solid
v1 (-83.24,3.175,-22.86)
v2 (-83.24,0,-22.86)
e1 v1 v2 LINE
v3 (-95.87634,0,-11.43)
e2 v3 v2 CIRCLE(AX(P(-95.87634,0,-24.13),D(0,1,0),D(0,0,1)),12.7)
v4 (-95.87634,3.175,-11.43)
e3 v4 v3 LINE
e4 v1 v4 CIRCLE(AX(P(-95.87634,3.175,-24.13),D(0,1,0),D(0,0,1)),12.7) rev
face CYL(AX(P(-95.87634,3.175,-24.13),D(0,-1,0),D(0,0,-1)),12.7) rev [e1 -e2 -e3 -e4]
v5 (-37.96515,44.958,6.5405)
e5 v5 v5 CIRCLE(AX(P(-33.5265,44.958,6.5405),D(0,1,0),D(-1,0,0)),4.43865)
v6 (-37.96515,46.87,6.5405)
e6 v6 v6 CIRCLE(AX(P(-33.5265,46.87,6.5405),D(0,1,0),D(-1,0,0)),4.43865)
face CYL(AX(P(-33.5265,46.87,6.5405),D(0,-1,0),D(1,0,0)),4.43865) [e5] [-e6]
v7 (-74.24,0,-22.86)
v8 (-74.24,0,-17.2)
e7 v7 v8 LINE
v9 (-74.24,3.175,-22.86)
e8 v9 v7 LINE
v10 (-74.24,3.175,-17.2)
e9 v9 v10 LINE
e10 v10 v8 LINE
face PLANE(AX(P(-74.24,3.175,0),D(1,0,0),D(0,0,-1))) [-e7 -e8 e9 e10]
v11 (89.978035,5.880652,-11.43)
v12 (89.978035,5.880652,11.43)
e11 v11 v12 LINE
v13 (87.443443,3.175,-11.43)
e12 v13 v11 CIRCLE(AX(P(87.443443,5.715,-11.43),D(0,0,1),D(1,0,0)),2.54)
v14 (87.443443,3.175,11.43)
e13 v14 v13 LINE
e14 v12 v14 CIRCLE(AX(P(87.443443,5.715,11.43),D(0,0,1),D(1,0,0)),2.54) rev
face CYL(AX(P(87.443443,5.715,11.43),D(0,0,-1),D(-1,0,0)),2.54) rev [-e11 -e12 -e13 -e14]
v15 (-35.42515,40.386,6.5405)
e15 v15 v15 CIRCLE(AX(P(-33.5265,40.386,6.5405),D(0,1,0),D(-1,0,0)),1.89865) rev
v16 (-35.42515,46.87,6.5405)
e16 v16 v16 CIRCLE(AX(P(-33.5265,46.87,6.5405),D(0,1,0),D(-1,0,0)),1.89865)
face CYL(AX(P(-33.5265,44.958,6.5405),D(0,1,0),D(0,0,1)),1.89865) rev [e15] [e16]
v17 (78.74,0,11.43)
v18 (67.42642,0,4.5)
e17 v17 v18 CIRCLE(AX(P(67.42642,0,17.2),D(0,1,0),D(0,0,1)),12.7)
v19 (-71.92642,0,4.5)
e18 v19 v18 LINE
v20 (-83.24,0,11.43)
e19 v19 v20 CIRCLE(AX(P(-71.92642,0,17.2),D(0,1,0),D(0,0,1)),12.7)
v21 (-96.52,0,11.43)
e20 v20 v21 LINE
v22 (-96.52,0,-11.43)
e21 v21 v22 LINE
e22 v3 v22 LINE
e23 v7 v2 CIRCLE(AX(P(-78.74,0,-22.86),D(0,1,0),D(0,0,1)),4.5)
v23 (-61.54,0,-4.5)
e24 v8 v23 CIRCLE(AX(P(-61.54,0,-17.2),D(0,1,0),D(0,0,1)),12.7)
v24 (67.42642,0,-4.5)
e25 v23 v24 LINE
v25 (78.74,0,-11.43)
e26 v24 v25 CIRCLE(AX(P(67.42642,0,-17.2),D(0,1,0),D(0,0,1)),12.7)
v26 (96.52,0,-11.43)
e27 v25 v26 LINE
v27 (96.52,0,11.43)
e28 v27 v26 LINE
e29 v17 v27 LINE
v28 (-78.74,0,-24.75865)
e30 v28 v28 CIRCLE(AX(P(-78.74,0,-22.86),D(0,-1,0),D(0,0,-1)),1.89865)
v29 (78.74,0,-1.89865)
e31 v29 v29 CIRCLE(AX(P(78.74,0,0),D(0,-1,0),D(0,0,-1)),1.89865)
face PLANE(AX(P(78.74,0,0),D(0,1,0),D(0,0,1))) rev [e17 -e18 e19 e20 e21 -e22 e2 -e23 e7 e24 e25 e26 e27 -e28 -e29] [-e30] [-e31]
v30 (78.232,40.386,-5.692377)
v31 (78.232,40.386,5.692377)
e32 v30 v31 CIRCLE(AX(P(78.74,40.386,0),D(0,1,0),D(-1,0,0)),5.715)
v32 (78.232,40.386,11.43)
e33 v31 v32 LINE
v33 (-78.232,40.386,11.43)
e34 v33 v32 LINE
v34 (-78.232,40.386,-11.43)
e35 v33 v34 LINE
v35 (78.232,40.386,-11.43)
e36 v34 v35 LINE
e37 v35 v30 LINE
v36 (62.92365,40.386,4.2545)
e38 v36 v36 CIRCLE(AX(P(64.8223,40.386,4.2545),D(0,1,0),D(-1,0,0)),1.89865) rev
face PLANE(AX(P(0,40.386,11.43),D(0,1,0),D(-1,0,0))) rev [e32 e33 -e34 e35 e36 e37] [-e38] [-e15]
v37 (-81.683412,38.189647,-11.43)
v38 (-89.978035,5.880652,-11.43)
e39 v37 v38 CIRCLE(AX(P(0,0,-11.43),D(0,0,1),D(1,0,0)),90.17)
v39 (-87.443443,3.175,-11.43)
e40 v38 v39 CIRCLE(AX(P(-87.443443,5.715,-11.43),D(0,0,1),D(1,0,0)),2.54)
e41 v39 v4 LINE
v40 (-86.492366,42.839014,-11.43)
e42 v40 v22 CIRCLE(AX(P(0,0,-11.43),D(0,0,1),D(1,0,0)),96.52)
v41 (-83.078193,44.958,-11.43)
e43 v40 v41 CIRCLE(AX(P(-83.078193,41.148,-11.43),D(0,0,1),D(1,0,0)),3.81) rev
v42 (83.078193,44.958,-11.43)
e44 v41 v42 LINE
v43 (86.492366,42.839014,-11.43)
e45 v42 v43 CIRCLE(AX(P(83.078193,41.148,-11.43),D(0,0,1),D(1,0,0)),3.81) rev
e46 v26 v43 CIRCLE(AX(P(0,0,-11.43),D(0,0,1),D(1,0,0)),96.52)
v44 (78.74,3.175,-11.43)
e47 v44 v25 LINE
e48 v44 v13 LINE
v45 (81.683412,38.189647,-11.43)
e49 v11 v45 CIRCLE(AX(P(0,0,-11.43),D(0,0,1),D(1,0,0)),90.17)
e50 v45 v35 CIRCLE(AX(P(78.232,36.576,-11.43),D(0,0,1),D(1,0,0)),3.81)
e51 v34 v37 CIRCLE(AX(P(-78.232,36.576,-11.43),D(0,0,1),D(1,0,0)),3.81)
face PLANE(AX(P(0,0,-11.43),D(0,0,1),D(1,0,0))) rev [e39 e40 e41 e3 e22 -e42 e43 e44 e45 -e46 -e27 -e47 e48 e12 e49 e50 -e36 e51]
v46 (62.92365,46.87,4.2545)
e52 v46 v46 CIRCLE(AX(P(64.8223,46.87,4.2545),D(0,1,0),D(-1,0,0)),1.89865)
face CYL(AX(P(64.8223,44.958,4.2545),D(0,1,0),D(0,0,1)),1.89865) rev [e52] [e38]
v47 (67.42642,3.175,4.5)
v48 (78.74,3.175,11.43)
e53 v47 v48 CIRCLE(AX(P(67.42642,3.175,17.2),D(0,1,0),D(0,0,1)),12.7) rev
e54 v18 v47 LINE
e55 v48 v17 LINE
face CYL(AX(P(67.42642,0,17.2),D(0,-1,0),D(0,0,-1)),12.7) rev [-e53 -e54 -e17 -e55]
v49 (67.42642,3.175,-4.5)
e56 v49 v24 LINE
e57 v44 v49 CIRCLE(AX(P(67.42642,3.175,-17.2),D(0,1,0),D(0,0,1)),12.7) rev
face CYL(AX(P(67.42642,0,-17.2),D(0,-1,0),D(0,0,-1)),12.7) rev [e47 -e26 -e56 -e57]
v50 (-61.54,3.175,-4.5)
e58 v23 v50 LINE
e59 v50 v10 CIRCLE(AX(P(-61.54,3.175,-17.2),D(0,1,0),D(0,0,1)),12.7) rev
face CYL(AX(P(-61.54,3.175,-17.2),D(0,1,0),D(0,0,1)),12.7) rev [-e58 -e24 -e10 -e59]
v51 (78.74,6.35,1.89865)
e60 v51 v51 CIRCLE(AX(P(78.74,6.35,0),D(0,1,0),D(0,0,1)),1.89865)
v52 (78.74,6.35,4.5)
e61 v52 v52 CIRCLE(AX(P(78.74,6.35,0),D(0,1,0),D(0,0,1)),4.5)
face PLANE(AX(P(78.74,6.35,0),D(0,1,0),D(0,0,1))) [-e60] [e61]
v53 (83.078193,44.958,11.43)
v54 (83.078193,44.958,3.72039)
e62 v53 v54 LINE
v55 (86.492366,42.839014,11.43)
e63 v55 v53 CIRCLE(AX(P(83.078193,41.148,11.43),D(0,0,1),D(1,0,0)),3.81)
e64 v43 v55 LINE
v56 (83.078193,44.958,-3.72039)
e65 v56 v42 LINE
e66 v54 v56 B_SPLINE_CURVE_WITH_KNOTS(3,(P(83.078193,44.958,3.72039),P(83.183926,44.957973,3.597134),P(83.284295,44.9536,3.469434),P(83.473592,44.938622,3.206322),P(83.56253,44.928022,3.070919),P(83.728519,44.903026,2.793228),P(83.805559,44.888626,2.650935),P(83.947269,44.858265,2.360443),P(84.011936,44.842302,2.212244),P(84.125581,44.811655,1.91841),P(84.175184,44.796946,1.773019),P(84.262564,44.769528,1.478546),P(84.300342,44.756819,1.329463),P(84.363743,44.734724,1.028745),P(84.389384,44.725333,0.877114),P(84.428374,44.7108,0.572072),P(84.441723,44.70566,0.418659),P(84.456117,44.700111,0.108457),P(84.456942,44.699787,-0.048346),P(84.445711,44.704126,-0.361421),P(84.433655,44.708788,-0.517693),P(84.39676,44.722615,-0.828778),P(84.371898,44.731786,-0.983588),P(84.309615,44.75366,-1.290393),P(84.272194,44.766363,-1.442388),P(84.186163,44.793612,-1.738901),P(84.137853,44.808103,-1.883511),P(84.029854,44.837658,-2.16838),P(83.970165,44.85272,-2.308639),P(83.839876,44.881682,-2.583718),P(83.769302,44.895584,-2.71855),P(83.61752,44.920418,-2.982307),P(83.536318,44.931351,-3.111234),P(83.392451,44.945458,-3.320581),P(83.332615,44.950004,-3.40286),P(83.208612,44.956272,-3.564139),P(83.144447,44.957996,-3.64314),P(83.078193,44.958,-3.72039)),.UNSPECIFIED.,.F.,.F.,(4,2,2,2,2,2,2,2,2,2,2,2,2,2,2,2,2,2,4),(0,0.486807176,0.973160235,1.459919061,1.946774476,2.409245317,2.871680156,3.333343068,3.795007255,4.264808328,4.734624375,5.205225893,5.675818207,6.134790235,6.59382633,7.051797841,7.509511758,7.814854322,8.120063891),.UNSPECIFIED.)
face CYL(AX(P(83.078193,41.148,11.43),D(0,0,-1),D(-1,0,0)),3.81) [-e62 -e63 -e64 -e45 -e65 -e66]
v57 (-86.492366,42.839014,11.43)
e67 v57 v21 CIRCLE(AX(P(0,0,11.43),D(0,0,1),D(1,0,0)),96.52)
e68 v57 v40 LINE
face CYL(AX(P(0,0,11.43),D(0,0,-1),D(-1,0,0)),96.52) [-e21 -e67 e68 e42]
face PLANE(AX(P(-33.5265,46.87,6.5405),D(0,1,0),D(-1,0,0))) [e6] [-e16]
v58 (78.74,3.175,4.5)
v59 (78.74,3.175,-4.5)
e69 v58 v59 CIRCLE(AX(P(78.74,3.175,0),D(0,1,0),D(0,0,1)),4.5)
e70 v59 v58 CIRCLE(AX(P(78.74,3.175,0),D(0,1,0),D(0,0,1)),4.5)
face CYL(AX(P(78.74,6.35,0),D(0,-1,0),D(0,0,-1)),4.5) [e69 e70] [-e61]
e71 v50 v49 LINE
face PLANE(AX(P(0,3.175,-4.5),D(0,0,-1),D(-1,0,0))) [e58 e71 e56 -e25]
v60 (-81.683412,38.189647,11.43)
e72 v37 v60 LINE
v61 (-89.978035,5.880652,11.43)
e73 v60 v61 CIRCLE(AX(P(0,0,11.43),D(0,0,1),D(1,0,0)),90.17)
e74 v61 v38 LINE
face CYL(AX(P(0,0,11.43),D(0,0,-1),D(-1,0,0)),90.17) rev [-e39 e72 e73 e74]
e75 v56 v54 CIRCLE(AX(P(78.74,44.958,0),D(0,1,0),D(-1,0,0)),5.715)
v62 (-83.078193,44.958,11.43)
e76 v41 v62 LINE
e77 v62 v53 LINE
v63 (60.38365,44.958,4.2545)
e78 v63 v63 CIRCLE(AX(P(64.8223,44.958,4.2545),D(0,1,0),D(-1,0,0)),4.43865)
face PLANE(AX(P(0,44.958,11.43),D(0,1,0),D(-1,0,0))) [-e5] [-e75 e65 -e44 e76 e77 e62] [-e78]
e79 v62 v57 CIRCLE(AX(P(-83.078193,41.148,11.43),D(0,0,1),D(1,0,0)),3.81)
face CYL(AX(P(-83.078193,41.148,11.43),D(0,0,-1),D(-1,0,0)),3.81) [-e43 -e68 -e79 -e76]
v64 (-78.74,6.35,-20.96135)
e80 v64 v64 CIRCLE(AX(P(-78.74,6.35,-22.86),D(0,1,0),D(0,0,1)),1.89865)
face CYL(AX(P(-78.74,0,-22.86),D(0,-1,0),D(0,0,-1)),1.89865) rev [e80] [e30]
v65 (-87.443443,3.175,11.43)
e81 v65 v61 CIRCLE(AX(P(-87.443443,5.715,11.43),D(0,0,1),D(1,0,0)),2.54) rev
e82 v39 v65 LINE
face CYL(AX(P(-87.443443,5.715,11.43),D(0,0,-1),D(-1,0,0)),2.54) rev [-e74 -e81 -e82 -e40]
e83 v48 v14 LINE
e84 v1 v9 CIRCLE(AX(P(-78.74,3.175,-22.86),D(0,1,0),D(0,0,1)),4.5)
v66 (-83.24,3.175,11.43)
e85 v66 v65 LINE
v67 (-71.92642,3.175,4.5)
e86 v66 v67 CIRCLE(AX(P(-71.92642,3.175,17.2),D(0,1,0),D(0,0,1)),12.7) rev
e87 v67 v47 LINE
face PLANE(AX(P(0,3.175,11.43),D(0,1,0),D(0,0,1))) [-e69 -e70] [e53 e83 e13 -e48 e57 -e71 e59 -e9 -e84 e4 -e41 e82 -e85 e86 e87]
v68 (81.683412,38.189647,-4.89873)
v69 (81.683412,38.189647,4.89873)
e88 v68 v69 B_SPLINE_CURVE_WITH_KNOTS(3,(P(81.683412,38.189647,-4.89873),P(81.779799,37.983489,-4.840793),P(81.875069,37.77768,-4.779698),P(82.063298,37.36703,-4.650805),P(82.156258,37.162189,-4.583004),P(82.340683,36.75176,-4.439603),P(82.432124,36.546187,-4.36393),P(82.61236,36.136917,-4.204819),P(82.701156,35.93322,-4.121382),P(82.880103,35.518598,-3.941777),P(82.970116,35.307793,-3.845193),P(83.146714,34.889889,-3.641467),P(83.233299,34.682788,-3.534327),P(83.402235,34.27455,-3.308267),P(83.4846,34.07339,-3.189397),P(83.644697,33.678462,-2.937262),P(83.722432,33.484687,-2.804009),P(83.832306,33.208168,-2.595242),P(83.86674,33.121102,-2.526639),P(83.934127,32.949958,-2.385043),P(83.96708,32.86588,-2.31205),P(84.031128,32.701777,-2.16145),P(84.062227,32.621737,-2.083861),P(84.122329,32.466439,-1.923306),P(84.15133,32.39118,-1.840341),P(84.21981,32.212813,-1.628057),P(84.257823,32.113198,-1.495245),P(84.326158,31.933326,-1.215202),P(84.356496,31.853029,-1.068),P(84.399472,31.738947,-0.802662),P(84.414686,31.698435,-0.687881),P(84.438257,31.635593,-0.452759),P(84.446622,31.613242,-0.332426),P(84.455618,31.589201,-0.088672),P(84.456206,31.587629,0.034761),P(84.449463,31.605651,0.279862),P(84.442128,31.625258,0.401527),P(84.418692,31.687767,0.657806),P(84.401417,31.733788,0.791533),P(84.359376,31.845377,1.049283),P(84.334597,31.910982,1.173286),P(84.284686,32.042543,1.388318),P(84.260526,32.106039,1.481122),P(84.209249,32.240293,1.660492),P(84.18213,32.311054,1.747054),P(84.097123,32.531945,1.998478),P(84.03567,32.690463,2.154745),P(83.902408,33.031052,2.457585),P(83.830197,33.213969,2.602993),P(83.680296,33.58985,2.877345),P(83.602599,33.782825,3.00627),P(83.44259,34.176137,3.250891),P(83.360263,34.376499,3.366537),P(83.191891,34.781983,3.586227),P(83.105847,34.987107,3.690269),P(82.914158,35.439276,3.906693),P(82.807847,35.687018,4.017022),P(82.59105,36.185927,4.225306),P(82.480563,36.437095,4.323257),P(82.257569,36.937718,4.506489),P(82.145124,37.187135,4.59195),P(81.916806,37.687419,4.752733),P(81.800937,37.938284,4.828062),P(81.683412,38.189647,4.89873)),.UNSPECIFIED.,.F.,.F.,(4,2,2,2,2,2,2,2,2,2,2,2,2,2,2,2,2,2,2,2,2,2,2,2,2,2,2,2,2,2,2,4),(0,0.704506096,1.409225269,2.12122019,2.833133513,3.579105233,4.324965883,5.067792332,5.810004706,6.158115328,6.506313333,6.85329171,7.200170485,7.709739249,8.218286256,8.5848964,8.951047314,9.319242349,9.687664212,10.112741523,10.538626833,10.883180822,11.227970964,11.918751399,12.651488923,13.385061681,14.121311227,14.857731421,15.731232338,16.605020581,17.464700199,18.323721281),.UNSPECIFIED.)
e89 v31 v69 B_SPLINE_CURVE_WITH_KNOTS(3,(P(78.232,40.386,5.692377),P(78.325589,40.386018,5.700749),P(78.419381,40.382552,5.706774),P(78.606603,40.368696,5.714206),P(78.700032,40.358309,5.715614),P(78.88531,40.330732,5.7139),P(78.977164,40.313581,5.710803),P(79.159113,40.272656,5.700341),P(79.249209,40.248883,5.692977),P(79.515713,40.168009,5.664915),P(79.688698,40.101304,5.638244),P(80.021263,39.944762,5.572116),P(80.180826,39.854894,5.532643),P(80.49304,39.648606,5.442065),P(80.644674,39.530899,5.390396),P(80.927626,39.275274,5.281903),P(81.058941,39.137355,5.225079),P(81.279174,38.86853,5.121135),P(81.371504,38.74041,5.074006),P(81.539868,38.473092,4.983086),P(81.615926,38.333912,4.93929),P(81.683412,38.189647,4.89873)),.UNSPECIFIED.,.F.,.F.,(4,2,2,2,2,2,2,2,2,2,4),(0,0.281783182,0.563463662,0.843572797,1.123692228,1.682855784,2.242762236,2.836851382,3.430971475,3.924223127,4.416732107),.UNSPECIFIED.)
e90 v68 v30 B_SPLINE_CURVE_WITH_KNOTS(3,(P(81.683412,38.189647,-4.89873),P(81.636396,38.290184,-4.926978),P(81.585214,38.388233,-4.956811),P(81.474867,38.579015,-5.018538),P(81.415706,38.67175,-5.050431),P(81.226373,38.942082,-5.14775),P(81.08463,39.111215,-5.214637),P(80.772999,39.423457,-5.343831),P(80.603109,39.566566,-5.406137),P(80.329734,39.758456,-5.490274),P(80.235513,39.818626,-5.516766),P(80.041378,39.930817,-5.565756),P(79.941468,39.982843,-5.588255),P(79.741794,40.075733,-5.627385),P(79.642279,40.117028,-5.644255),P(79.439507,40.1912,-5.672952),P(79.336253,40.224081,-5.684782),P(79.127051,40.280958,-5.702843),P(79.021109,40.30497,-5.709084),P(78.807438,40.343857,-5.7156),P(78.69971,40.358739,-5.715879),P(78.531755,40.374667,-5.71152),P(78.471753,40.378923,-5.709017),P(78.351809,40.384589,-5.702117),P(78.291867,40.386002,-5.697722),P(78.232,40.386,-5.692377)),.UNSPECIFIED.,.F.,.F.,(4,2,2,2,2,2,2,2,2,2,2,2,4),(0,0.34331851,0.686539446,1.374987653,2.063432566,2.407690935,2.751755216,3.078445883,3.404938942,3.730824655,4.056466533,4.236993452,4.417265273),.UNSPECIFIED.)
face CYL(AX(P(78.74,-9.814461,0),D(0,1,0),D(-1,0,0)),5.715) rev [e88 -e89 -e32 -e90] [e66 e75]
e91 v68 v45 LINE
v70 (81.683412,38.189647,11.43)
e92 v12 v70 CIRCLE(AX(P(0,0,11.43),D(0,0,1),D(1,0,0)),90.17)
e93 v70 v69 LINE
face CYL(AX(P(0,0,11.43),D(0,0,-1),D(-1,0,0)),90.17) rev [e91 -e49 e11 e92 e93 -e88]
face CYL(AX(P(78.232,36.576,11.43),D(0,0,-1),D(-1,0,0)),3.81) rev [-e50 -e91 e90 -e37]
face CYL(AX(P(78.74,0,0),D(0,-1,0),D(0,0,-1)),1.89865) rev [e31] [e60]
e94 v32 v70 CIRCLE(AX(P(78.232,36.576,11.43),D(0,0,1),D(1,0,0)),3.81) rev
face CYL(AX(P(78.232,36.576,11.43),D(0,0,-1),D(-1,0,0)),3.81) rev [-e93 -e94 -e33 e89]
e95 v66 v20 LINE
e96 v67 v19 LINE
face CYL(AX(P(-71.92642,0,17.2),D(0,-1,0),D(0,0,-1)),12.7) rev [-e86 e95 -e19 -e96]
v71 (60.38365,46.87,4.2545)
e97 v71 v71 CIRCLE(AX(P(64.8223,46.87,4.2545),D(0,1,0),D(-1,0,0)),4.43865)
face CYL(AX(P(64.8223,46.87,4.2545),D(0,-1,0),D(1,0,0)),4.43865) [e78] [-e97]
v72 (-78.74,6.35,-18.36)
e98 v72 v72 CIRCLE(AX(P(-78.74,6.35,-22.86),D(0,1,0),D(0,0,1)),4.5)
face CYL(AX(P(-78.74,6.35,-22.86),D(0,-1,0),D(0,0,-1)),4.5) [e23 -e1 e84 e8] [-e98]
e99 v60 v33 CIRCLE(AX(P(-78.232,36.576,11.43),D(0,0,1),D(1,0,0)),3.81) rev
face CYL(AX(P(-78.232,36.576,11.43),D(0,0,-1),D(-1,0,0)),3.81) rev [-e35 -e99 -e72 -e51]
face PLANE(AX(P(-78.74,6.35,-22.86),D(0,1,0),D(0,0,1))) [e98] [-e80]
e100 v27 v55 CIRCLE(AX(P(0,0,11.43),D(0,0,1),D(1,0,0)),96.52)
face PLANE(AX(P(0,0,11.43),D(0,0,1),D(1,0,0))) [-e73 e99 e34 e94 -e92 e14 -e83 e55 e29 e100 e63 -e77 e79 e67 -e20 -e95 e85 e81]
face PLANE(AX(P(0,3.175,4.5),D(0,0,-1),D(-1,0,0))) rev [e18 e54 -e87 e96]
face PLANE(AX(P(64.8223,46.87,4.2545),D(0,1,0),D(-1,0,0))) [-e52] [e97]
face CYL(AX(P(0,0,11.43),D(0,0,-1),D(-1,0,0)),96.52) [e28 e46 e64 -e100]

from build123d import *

# Parameters (mm, degrees)
SKETCH1_R                  = 4.5
BOSS_EXTRUDE1_DEPTH        = 6.35
BOSS_EXTRUDE1_2_DEPTH      = 6.35
BOSS_EXTRUDE2_DEPTH        = 3.175
SKETCH5_W                  = 4.5
SKETCH5_H                  = 3.175
BOSS_EXTRUDE3_DEPTH        = 11.43
F_6_CLEARANCE_HOLE1_D      = 3.7973
FILLET1_R                  = 2.54
FILLET2_R                  = 3.81
FILLET3_R                  = 12.7
CUT_EXTRUDE1_REACH         = 111.936
SKETCH10_R                 = 5.715
F_6_CLEARANCE_HOLE2_REACH  = 143.713
F_6_CLEARANCE_HOLE2_BORE_R = 1.89865
BOSS_EXTRUDE5_START        = 1.912
SKETCH13_R                 = 4.43865
SKETCH13_R_2               = 1.89865
BOSS_EXTRUDE5_DEPTH        = 1.912


with BuildPart() as part:
    # Sketch1 → Boss-Extrude1 (new body)
    with BuildSketch(Plane(origin=(0, 0, 0), x_dir=(1, 0, 0), z_dir=(0, 1, 0))):
        with Locations(Location((78.74, 0, 0), (0, 0, 270))):
            Circle(SKETCH1_R)
    extrude(amount=BOSS_EXTRUDE1_DEPTH)



with BuildPart() as body_2:
    # Sketch1 → Boss-Extrude1 2 (new body)
    with BuildSketch(Plane(origin=(0, 0, 0), x_dir=(1, 0, 0), z_dir=(0, 1, 0))):
        with Locations(Location((-78.74, 22.86, 0), (0, 0, 270))):
            Circle(SKETCH1_R)
    extrude(amount=BOSS_EXTRUDE1_2_DEPTH)


with BuildPart() as part_1:
    add(part.part)

    add(body_2.part)  # Boss-Extrude2 merges body 2
    # Sketch2 → Boss-Extrude2 (add)
    with BuildSketch(Plane(origin=(0, 0, 0), x_dir=(1, 0, 0), z_dir=(0, 1, 0))):
        with BuildLine():
            ThreePointArc((-74.24, 22.86), (-78.74, 18.36), (-83.24, 22.86))
            Line((-83.24, 22.86), (-83.24, -4.5))
            Line((-83.24, -4.5), (78.74, -4.5))
            ThreePointArc((78.74, -4.5), (74.24, 0), (78.74, 4.5))
            Line((78.74, 4.5), (-74.24, 4.5))
            Line((-74.24, 4.5), (-74.24, 22.86))
        make_face()
    extrude(amount=BOSS_EXTRUDE2_DEPTH)

    # Sketch5 → Boss-Extrude3 (add, symmetric)
    with BuildSketch(Plane.XY):
        with BuildLine():
            ThreePointArc((-90.114084776, 3.175), (-87.371075104, 22.291795245), (-80.620096155, 40.386))
            Line((-80.620096155, 40.386), (-87.664596069, 40.386))
            ThreePointArc((-87.664596069, 40.386), (-94.280160195, 20.672730678), (-96.52, 0))
            Line((-96.52, 0), (-83.24, 0))
            Line((-83.24, 0), (-83.24, 3.175))
            Line((-83.24, 3.175), (-90.114084776, 3.175))
        make_face()
        with BuildLine():
            Line((80.620096155, 40.386), (87.664596069, 40.386))
            ThreePointArc((87.664596069, 40.386), (86.567546752, 42.686886152), (85.41012022, 44.958))
            Line((85.41012022, 44.958), (78.162696576, 44.958))
            ThreePointArc((78.162696576, 44.958), (79.424301148, 42.689685958), (80.620096155, 40.386))
        make_face()
        with BuildLine():
            Line((-87.664596069, 40.386), (-80.620096155, 40.386))
            ThreePointArc((-80.620096155, 40.386), (-79.424301148, 42.689685958), (-78.162696576, 44.958))
            Line((-78.162696576, 44.958), (-85.41012022, 44.958))
            ThreePointArc((-85.41012022, 44.958), (-86.567546752, 42.686886152), (-87.664596069, 40.386))
        make_face()
        with BuildLine():
            Line((-80.620096155, 40.386), (80.620096155, 40.386))
            ThreePointArc((80.620096155, 40.386), (79.424301148, 42.689685958), (78.162696576, 44.958))
            Line((78.162696576, 44.958), (-78.162696576, 44.958))
            ThreePointArc((-78.162696576, 44.958), (-79.424301148, 42.689685958), (-80.620096155, 40.386))
        make_face()
        with Locations((80.99, 1.5875)):
            Rectangle(SKETCH5_W, SKETCH5_H)
        with BuildLine():
            Line((83.24, 3.175), (83.24, 0))
            Line((83.24, 0), (96.52, 0))
            ThreePointArc((96.52, 0), (94.280160195, 20.672730678), (87.664596069, 40.386))
            Line((87.664596069, 40.386), (80.620096155, 40.386))
            ThreePointArc((80.620096155, 40.386), (87.371075104, 22.291795245), (90.114084776, 3.175))
            Line((90.114084776, 3.175), (83.24, 3.175))
        make_face()
    extrude(amount=BOSS_EXTRUDE3_DEPTH, both=True)

    # #6 Clearance Hole1 (through all)
    with Locations(Plane(origin=(-78.74, 0, -22.86), x_dir=(0, 0, -1), z_dir=(0, -1, 0))):
        with Locations((0, 0), (-22.86, 157.48)):
            Hole(F_6_CLEARANCE_HOLE1_D / 2)

    # Fillet1
    fillet1_edges = [part_1.edges().sort_by_distance(p)[0] for p in [
        (-90.114084776, 3.175, 0),
        (90.114084776, 3.175, 0),
    ]]
    fillet(fillet1_edges, radius=FILLET1_R)

    # Fillet2
    # the kernel refuses this fillet: 3.81 mm, written as the material it adds along each edge
    with BuildSketch(Plane(origin=(80.620096155, 40.386, 5.835732073), x_dir=(-1, 0, 0), z_dir=(0, 0, -1))) as fillet2_piece_1_section:
        with BuildLine():
            CenterArc((2.388096155, -3.81), FILLET2_R, 90, 64.942384582)
            ThreePointArc((-1.06331561, -2.196352941), (-0.539087936, -1.094579337), (0, 0))
            Line((0, 0), (2.388096155, 0))
        make_face()
    fillet2_piece_1 = extrude(amount=17.265732073, mode=Mode.PRIVATE)
    fillet2_piece_1 = fillet2_piece_1 - Plane(origin=(78.74, 40.386, 0), x_dir=(0, 0, 1), z_dir=(0, 1, 0)) * Cylinder(1.89865, 45, mode=Mode.PRIVATE)
    add(fillet2_piece_1)
    with BuildSketch(Plane(origin=(80.620096155, 40.386, 11.43), x_dir=(-1, 0, 0), z_dir=(0, 0, -1))) as fillet2_piece_2_section:
        with BuildLine():
            CenterArc((2.388096155, -3.81), FILLET2_R, 90, 64.942384582)
            ThreePointArc((-1.06331561, -2.196352941), (-0.539087936, -1.094579337), (0, 0))
            Line((0, 0), (2.388096155, 0))
        make_face()
    fillet2_piece_2 = extrude(amount=17.265732073, mode=Mode.PRIVATE)
    fillet2_piece_2 = fillet2_piece_2 - Plane(origin=(78.74, 40.386, 0), x_dir=(0, 0, 1), z_dir=(0, 1, 0)) * Cylinder(1.89865, 45, mode=Mode.PRIVATE)
    add(fillet2_piece_2)
    with BuildSketch(Plane(origin=(-80.620096155, 40.386, -11.43), x_dir=(-0.4357482606496553, -0.900068582576239, 0), z_dir=(0, 0, 1))) as fillet2_piece_3:
        with BuildLine():
            CenterArc((2.388652554, 3.809651194), FILLET2_R, 205.832916425, 64.942384582)
            Line((-1.040608746, 2.149450321), (0, 0))
            ThreePointArc((0, 0), (1.220103103, -0.008255072), (2.440206206, 0))
        make_face()
    extrude(amount=22.86)
    # the kernel refuses this fillet: 3.81 mm, written as the material it takes off along each edge
    with BuildSketch(Plane(origin=(-85.41012022, 44.958, -17.378402089), x_dir=(-0.4548470974381097, -0.8905695469485393, 0), z_dir=(0, 0, 1))) as fillet2_2_piece_1:
        with BuildLine():
            CenterArc((2.332399766, 3.809710574), FILLET2_R, 207.055096642, 63.651134119)
            Line((-1.060670207, 2.076743133), (0, 0))
            ThreePointArc((0, 0), (1.189680418, -0.007332124), (2.379360836, 0))
        make_face()
    extrude(amount=34.756804178, mode=Mode.SUBTRACT)
    with BuildSketch(Plane(origin=(85.41012022, 44.958, 17.378402089), x_dir=(-1, 0, 0), z_dir=(0, 0, -1))) as fillet2_2_piece_2:
        with BuildLine():
            CenterArc((2.331926956, -3.81), FILLET2_R, 90, 63.651134119)
            ThreePointArc((-1.08224537, -2.118986301), (-0.547652451, -1.056158155), (0, 0))
            Line((0, 0), (2.331926956, 0))
        make_face()
    extrude(amount=34.756804178, mode=Mode.SUBTRACT)

    # Fillet3
    # the kernel refuses this fillet: 12.7 mm, written as the material it adds along each edge
    with BuildSketch(Plane(origin=(78.74, 0, -4.5), x_dir=(0, 0, -1), z_dir=(0, 1, 0)), Plane(origin=(-83.24, 0, 4.5), x_dir=(0, 0, 1), z_dir=(0, 1, 0))) as fillet3_piece_1:
        with BuildLine():
            CenterArc((12.7, 11.313580335), FILLET3_R, 180, 62.978120887)
            Line((0, 11.313580335), (0, 0))
            Line((0, 0), (6.93, 0))
        make_face()
    extrude(amount=3.175)
    with BuildSketch(Plane(origin=(78.74, 0, 4.5), x_dir=(0, 0, 1), z_dir=(0, 1, 0))) as fillet3_piece_2:
        with BuildLine():
            CenterArc((12.7, -11.313580335), FILLET3_R, 117.021879113, 62.978120887)
            Line((0, -11.313580335), (0, 0))
            Line((0, 0), (6.93, 0))
        make_face()
    extrude(amount=3.175)
    with BuildSketch(Plane(origin=(-74.24, 0, -4.5), x_dir=(1, 0, 0), z_dir=(0, 1, 0))) as fillet3_piece_3:
        with BuildLine():
            CenterArc((FILLET3_R, FILLET3_R), FILLET3_R, 180, 90)
            Line((0, FILLET3_R), (0, 0))
            Line((0, 0), (FILLET3_R, 0))
        make_face()
    extrude(amount=3.175)
    with BuildSketch(Plane(origin=(-83.24, 0, -11.43), x_dir=(-1, 0, 0), z_dir=(0, 1, 0))) as fillet3_piece_4:
        with BuildLine():
            CenterArc((12.636340451, -12.7), FILLET3_R, 90, 84.260829523)
            Line((0, -11.43), (0, 0))
            Line((0, 0), (12.636340451, 0))
        make_face()
    extrude(amount=3.175)

    # Cut-Extrude1: up to this face of the body (flat: up to its plane)
    cut_extrude1_end = Plane(part_1.part.faces().sort_by_distance((78.74, 6.35, -4.372720779))[0])
    # Sketch10 → Cut-Extrude1 (cut, up to the picked face)
    with BuildSketch(Plane(origin=(0, 44.958, 0), x_dir=(1, 0, 0), z_dir=(0, 1, 0)), mode=Mode.PRIVATE) as cut_extrude1_sk1:
        with Locations(Location((78.74, 0, 0), (0, 0, 95.099688914))):
            Circle(SKETCH10_R)
    cut_extrude1_tool1 = split(extrude(cut_extrude1_sk1.sketch, amount=-CUT_EXTRUDE1_REACH, mode=Mode.PRIVATE), bisect_by=cut_extrude1_end, keep=Keep.BOTH, mode=Mode.PRIVATE)
    add(cut_extrude1_tool1.solids().sort_by(Axis((78.74, 44.958, 0), (0, -1, 0)))[0], mode=Mode.SUBTRACT)

    # #6 Clearance Hole2 bore (on position points) → #6 Clearance Hole2 (cut, up to next)
    with BuildSketch(Plane(origin=(-33.5265, 44.958, 6.5405), x_dir=(1, 0, 0), z_dir=(0, 1, 0)), mode=Mode.PRIVATE) as f_6_clearance_hole2_sk1:
        Circle(F_6_CLEARANCE_HOLE2_BORE_R)
    f_6_clearance_hole2_tool1 = extrude(f_6_clearance_hole2_sk1.sketch, amount=-F_6_CLEARANCE_HOLE2_REACH, mode=Mode.PRIVATE) & part_1.part
    # #6 Clearance Hole2 bore (on position points) → #6 Clearance Hole2 (cut, up to next)
    with BuildSketch(Plane(origin=(-33.5265, 44.958, 6.5405), x_dir=(1, 0, 0), z_dir=(0, 1, 0)), mode=Mode.PRIVATE) as f_6_clearance_hole2_sk2:
        with Locations((98.3488, 2.286)):
            Circle(F_6_CLEARANCE_HOLE2_BORE_R)
    f_6_clearance_hole2_tool2 = extrude(f_6_clearance_hole2_sk2.sketch, amount=-F_6_CLEARANCE_HOLE2_REACH, mode=Mode.PRIVATE) & part_1.part
    add(f_6_clearance_hole2_tool1.solids().sort_by_distance((-33.5265, 44.958, 6.5405))[0], mode=Mode.SUBTRACT)
    add(f_6_clearance_hole2_tool2.solids().sort_by_distance((64.8223, 44.958, 4.2545))[0], mode=Mode.SUBTRACT)

    # Sketch13 → Boss-Extrude5 (add)
    # profile 1 of 2: a face of its own
    with BuildSketch(Plane(origin=(0, 44.958, 0), x_dir=(1, 0, 0), z_dir=(0, 1, 0)).offset(BOSS_EXTRUDE5_START)):
        with Locations(Location((-33.5265, -6.5405, 0), (0, 0, 180))):
            Circle(SKETCH13_R)
        with Locations(Location((-33.5265, -6.5405, 0), (0, 0, 180))):
            Circle(SKETCH13_R_2, mode=Mode.SUBTRACT)
    # profile 2 of 2: a face of its own
    with BuildSketch(Plane(origin=(0, 44.958, 0), x_dir=(1, 0, 0), z_dir=(0, 1, 0)).offset(BOSS_EXTRUDE5_START)):
        with Locations(Location((64.8223, -4.2545, 0), (0, 0, 180))):
            Circle(SKETCH13_R)
        with Locations(Location((64.8223, -4.2545, 0), (0, 0, 180))):
            Circle(SKETCH13_R_2, mode=Mode.SUBTRACT)
    extrude(amount=-BOSS_EXTRUDE5_DEPTH)


solid = part_1.part
